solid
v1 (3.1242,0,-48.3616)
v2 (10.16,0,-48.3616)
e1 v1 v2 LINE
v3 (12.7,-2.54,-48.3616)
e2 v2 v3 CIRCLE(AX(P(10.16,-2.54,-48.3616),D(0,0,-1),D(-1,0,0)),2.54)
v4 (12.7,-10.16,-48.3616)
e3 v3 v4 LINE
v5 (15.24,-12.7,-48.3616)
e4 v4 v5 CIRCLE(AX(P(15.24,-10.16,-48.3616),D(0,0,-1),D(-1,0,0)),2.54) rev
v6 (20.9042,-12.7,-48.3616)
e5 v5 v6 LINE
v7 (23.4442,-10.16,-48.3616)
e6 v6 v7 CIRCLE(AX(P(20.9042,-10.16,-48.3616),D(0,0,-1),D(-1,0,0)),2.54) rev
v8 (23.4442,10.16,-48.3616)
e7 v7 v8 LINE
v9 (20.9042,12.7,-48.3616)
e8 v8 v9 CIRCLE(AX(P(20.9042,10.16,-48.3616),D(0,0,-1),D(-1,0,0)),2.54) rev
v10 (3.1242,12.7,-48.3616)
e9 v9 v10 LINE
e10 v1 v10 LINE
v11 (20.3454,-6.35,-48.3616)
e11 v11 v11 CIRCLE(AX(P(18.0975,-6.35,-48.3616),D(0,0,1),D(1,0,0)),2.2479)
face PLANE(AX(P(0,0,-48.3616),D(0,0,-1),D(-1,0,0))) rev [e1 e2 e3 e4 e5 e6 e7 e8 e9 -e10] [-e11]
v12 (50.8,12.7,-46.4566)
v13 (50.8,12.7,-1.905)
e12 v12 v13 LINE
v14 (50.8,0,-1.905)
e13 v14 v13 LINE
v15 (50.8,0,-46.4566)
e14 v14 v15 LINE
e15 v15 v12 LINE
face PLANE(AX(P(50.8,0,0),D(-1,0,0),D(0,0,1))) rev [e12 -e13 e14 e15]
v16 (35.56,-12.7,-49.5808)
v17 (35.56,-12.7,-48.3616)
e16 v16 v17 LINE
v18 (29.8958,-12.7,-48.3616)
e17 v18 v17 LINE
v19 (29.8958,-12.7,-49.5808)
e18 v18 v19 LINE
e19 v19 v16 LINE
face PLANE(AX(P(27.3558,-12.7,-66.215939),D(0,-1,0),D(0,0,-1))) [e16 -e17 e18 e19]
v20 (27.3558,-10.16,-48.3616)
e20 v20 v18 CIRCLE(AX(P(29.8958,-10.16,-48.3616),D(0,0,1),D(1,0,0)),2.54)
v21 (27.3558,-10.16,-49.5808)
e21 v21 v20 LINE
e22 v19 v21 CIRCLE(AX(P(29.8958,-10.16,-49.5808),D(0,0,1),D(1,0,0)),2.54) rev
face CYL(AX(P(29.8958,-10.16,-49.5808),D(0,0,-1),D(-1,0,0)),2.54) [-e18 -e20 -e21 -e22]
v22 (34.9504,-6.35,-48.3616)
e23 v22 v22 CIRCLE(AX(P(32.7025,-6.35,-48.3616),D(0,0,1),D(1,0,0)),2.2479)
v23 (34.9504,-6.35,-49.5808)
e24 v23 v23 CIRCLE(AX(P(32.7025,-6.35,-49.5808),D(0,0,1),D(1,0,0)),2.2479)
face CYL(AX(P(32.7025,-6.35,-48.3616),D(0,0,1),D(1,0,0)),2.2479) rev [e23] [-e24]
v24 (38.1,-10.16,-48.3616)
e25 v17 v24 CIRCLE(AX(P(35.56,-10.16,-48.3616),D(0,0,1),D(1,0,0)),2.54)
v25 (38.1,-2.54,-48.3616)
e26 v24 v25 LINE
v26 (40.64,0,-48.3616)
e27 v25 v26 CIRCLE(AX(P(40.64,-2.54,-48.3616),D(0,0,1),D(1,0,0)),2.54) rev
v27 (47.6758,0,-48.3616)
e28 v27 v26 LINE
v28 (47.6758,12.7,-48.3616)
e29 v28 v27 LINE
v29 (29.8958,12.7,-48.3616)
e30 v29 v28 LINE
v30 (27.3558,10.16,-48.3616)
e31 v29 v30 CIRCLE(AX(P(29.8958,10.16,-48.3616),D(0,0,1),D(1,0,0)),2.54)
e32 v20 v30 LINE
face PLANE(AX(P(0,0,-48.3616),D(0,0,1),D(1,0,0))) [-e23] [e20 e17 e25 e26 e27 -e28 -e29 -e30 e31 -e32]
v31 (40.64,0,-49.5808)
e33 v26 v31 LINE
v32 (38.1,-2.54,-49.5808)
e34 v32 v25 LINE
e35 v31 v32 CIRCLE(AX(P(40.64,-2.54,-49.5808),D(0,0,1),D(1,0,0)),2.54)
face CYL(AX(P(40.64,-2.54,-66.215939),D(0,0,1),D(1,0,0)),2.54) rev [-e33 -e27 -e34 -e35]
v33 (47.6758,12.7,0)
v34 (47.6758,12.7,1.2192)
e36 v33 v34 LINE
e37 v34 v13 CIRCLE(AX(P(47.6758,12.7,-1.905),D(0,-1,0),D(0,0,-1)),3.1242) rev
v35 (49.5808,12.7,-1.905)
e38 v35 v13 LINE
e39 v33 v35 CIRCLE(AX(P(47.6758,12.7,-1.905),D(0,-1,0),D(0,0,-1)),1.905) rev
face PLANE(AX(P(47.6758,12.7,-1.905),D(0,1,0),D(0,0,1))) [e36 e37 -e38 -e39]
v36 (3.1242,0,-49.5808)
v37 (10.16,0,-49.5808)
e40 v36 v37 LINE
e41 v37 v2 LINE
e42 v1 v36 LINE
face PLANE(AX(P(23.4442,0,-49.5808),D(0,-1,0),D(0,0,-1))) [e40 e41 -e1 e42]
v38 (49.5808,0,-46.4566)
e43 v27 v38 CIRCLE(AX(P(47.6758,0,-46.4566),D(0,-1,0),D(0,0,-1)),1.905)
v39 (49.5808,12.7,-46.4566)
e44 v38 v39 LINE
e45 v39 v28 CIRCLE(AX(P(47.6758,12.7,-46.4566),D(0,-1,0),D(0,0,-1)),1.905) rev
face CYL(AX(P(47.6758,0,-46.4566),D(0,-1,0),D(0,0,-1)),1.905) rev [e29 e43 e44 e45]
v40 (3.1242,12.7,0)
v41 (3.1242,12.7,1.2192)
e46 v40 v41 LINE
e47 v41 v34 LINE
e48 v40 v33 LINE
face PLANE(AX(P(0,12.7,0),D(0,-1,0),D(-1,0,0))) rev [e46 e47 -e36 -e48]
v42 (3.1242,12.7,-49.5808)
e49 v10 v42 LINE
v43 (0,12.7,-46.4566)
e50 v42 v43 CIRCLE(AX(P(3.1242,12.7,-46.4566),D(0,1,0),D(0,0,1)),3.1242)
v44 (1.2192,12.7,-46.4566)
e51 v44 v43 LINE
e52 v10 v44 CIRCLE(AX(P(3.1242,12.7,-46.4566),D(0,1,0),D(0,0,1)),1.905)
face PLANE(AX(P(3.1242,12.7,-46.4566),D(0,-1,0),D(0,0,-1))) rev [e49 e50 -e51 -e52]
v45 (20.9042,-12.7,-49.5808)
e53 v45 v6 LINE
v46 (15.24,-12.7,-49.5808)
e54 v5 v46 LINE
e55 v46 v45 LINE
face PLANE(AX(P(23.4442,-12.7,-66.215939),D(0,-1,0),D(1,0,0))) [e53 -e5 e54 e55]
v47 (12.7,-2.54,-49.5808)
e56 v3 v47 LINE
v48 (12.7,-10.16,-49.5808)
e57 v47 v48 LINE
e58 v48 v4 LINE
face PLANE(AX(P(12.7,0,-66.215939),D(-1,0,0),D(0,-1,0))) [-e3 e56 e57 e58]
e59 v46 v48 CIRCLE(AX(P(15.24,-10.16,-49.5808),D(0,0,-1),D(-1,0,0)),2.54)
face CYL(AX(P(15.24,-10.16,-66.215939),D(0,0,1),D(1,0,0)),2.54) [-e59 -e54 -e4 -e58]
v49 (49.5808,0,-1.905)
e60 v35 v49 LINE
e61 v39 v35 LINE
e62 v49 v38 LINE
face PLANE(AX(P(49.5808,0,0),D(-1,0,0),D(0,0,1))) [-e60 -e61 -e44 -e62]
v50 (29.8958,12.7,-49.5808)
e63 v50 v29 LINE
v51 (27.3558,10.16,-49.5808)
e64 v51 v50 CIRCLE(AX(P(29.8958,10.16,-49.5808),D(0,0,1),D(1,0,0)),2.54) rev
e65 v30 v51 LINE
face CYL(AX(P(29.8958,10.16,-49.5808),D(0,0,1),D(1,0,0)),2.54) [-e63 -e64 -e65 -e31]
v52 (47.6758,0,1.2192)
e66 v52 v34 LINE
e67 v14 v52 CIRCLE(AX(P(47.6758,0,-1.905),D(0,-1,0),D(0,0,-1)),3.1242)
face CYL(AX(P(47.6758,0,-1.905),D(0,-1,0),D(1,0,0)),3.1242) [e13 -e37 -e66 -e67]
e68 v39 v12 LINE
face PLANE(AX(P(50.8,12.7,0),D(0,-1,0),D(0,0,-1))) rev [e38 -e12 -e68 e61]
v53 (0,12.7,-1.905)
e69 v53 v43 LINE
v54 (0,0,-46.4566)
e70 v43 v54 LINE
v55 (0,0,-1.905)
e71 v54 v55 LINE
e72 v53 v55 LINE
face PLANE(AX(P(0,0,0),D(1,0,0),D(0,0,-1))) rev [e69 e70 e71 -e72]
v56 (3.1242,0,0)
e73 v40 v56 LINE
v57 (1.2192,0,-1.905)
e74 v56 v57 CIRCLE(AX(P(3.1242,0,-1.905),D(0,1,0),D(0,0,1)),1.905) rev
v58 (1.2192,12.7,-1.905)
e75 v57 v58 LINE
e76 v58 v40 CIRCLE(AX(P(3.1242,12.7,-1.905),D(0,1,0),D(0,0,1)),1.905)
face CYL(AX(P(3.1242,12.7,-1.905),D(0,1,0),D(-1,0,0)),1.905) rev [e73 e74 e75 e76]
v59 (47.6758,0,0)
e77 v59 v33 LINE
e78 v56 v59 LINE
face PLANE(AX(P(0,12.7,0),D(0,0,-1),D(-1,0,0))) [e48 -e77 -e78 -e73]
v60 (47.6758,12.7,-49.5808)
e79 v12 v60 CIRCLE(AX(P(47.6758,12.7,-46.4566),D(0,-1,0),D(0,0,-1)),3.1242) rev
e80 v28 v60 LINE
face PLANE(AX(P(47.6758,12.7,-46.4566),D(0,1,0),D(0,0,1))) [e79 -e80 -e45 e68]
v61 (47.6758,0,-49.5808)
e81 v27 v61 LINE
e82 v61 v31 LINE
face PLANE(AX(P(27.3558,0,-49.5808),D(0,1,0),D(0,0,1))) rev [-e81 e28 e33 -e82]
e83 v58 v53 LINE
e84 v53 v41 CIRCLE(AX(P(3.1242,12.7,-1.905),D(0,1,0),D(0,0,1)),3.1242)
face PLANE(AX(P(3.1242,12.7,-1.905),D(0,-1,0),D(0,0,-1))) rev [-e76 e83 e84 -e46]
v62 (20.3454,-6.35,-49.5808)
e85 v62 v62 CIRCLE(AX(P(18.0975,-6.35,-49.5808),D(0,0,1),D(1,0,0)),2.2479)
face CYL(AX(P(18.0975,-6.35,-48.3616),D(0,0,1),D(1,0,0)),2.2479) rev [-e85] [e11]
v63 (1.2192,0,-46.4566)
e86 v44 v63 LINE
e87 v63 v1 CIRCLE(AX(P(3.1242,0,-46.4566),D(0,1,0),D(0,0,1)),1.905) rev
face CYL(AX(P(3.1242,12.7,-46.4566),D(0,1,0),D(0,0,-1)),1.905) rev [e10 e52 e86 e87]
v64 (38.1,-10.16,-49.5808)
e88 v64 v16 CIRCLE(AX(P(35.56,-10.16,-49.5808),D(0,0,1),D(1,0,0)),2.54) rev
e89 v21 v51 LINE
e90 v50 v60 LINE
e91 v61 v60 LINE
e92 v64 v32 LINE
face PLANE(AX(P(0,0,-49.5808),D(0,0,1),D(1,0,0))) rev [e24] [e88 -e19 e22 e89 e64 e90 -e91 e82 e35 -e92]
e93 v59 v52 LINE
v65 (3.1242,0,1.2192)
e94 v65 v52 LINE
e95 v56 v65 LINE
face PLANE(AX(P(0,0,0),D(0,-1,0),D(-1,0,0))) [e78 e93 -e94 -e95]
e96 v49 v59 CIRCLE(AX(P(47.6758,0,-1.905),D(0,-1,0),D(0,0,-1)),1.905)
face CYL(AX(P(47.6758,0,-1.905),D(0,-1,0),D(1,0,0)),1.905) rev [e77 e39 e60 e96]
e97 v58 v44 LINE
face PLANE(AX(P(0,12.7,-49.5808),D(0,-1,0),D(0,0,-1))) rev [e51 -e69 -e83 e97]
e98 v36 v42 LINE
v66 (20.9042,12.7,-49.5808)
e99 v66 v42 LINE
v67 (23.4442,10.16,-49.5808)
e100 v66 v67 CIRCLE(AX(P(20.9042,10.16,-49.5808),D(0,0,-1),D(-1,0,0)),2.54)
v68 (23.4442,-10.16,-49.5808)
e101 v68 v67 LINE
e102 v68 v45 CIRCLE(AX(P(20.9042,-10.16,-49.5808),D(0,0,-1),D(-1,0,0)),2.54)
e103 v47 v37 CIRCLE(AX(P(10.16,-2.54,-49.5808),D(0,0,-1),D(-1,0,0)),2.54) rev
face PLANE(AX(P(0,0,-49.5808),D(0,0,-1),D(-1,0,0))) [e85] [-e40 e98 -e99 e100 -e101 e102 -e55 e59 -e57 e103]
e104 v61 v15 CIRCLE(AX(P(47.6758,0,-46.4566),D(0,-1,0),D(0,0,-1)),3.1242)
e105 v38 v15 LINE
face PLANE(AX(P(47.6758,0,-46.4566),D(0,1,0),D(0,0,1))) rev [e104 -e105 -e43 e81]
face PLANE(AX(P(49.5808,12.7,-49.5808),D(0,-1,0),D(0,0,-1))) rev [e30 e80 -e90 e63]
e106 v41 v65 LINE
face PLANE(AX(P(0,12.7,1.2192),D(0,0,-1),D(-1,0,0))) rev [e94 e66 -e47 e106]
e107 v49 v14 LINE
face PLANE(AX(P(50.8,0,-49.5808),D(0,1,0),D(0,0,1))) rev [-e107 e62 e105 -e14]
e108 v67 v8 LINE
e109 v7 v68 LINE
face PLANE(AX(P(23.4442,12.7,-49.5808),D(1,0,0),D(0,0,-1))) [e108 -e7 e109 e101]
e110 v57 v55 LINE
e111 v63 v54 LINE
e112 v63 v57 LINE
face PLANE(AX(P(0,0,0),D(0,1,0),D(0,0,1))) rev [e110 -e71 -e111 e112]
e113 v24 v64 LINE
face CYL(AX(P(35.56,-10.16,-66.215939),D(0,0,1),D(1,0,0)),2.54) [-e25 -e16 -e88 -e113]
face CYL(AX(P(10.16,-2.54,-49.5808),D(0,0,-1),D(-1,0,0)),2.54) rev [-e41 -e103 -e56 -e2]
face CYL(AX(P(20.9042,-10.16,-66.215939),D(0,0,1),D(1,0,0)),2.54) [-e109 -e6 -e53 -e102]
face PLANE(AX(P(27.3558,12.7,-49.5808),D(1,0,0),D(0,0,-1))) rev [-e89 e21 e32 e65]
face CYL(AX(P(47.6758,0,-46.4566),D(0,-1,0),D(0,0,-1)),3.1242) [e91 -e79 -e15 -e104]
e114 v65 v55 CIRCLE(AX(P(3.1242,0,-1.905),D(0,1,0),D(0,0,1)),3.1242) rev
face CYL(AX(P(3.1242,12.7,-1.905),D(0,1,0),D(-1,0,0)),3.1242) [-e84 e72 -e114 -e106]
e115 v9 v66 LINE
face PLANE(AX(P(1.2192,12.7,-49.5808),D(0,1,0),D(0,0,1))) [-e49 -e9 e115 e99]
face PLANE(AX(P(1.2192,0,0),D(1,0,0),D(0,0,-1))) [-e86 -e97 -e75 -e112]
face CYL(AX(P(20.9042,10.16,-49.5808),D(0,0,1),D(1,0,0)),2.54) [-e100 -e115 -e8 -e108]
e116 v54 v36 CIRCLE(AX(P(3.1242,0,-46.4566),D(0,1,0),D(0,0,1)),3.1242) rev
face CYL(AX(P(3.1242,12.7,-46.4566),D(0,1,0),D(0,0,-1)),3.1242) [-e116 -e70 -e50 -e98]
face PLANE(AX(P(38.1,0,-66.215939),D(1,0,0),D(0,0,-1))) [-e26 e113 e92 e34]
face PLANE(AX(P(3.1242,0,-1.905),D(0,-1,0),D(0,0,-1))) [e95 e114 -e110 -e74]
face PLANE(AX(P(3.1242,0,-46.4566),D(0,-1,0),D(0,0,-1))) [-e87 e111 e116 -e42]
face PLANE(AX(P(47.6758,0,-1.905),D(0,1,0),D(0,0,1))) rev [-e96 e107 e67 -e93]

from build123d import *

# Parameters (mm, degrees)
SKETCH1_W                      = 50.8
SKETCH1_H                      = 1.2192
BASE_FLANGE1_DEPTH             = 12.7
EDGE_FLANGE1_STRIP_W           = 8.6868
EDGE_FLANGE1_STRIP_H           = 1.2192
EDGE_FLANGE1_STRIP_CUT_DEPTH   = 12.7
EDGE_FLANGE1_STRIP_2_W         = 8.6868
EDGE_FLANGE1_STRIP_2_H         = 1.2192
EDGE_FLANGE1_STRIP_CUT_2_DEPTH = 12.7
EDGE_FLANGE1_DEPTH             = 12.7
EDGE_FLANGE1_BEND_DEPTH        = 12.7
EDGE_FLANGE2_STRIP_W           = 8.6868
EDGE_FLANGE2_STRIP_H           = 1.2192
EDGE_FLANGE2_STRIP_CUT_DEPTH   = 12.7
EDGE_FLANGE2_DEPTH             = 12.7
EDGE_FLANGE3_STRIP_W           = 8.6868
EDGE_FLANGE3_STRIP_H           = 1.2192
EDGE_FLANGE3_STRIP_CUT_DEPTH   = 12.7
EDGE_FLANGE3_DEPTH             = 12.7
SKETCH18_W                     = 10.7442
SKETCH18_H                     = 12.7
BOSS_EXTRUDE1_DEPTH            = 1.2192
FILLET1_R                      = 2.54
F_8_CLEARANCE_HOLE1_D          = 4.4958


# Sheet-metal steps are written as plain solids
with BuildPart() as part:
    # Sketch1 → Base-Flange1 (new body)
    with BuildSketch(Plane(origin=(0, 0, 0), x_dir=(1, 0, 0), z_dir=(0, 1, 0))):
        with Locations((25.4, -0.6096)):
            Rectangle(SKETCH1_W, SKETCH1_H)
    extrude(amount=BASE_FLANGE1_DEPTH)

    # Edge-Flange1 strip (across the edge) → Edge-Flange1 strip cut (cut)
    with BuildSketch(Plane(origin=(50.8, 12.7, 0), x_dir=(-1, 0, 0), z_dir=(0, -1, 0))):
        with Locations((-1.2192, -0.6096)):
            Rectangle(EDGE_FLANGE1_STRIP_W, EDGE_FLANGE1_STRIP_H)
    extrude(amount=EDGE_FLANGE1_STRIP_CUT_DEPTH, mode=Mode.SUBTRACT)

    # Edge-Flange1 strip 2 (across the edge) → Edge-Flange1 strip cut 2 (cut)
    with BuildSketch(Plane(origin=(0, 0, 0), x_dir=(1, 0, 0), z_dir=(0, 1, 0))):
        with Locations((-1.2192, -0.6096)):
            Rectangle(EDGE_FLANGE1_STRIP_2_W, EDGE_FLANGE1_STRIP_2_H)
    extrude(amount=EDGE_FLANGE1_STRIP_CUT_2_DEPTH, mode=Mode.SUBTRACT)

    # Edge-Flange1 section (across the edge) → Edge-Flange1 (add)
    with BuildSketch(Plane(origin=(50.8, 12.7, 0), x_dir=(-1, 0, 0), z_dir=(0, -1, 0))):
        with BuildLine():
            Line((0, 1.905), (0, 49.5808))
            Line((0, 49.5808), (1.2192, 49.5808))
            Line((1.2192, 49.5808), (1.2192, 1.905))
            ThreePointArc((1.2192, 1.905), (1.777161582, 0.557961582), (3.1242, 0))
            Line((3.1242, 0), (3.1242, -1.2192))
            ThreePointArc((3.1242, -1.2192), (0.915056994, -0.304143006), (0, 1.905))
        make_face()
    extrude(amount=EDGE_FLANGE1_DEPTH)

    # Edge-Flange1 section 2 (across the edge) → Edge-Flange1 bend (add)
    with BuildSketch(Plane(origin=(0, 0, 0), x_dir=(1, 0, 0), z_dir=(0, 1, 0))):
        with BuildLine():
            Line((0, 1.905), (0, 49.5808))
            Line((0, 49.5808), (1.2192, 49.5808))
            Line((1.2192, 49.5808), (1.2192, 1.905))
            ThreePointArc((1.2192, 1.905), (1.777161582, 0.557961582), (3.1242, 0))
            Line((3.1242, 0), (3.1242, -1.2192))
            ThreePointArc((3.1242, -1.2192), (0.915056994, -0.304143006), (0, 1.905))
        make_face()
    extrude(amount=EDGE_FLANGE1_BEND_DEPTH)

    # Edge-Flange2 strip (across the edge) → Edge-Flange2 strip cut (cut)
    with BuildSketch(Plane(origin=(49.5808, 12.7, -49.5808), x_dir=(0, 0, 1), z_dir=(0, -1, 0))):
        with Locations((-1.2192, -0.6096)):
            Rectangle(EDGE_FLANGE2_STRIP_W, EDGE_FLANGE2_STRIP_H)
    extrude(amount=EDGE_FLANGE2_STRIP_CUT_DEPTH, mode=Mode.SUBTRACT)

    # Edge-Flange2 section (across the edge) → Edge-Flange2 (add)
    with BuildSketch(Plane(origin=(49.5808, 12.7, -49.5808), x_dir=(0, 0, 1), z_dir=(0, -1, 0))):
        with BuildLine():
            Line((0, 1.905), (0, 22.225))
            Line((0, 22.225), (1.2192, 22.225))
            Line((1.2192, 22.225), (1.2192, 1.905))
            ThreePointArc((1.2192, 1.905), (1.777161582, 0.557961582), (3.1242, 0))
            Line((3.1242, 0), (3.1242, -1.2192))
            ThreePointArc((3.1242, -1.2192), (0.915056994, -0.304143006), (0, 1.905))
        make_face()
    extrude(amount=EDGE_FLANGE2_DEPTH)

    # Edge-Flange3 strip (across the edge) → Edge-Flange3 strip cut (cut)
    with BuildSketch(Plane(origin=(1.2192, 0, -49.5808), x_dir=(0, 0, 1), z_dir=(0, 1, 0))):
        with Locations((-1.2192, -0.6096)):
            Rectangle(EDGE_FLANGE3_STRIP_W, EDGE_FLANGE3_STRIP_H)
    extrude(amount=EDGE_FLANGE3_STRIP_CUT_DEPTH, mode=Mode.SUBTRACT)

    # Edge-Flange3 section (across the edge) → Edge-Flange3 (add)
    with BuildSketch(Plane(origin=(1.2192, 0, -49.5808), x_dir=(0, 0, 1), z_dir=(0, 1, 0))):
        with BuildLine():
            Line((0, 1.905), (0, 22.225))
            Line((0, 22.225), (1.2192, 22.225))
            Line((1.2192, 22.225), (1.2192, 1.905))
            ThreePointArc((1.2192, 1.905), (1.777161582, 0.557961582), (3.1242, 0))
            Line((3.1242, 0), (3.1242, -1.2192))
            ThreePointArc((3.1242, -1.2192), (0.915056994, -0.304143006), (0, 1.905))
        make_face()
    extrude(amount=EDGE_FLANGE3_DEPTH)

    # Sketch18 → Boss-Extrude1 (add)
    with BuildSketch(Plane.XY.offset(-48.3616)):
        with Locations((18.0721, -6.35)):
            Rectangle(SKETCH18_W, SKETCH18_H)
        with Locations((32.7279, -6.35)):
            Rectangle(SKETCH18_W, SKETCH18_H)
    extrude(amount=-BOSS_EXTRUDE1_DEPTH)

    # Fillet1
    fillet1_edges = [part.edges().sort_by_distance(p)[0] for p in [
        (23.4442, 12.7, -48.9712),
        (12.7, 0, -48.9712),
        (12.7, -12.7, -48.9712),
        (23.4442, -12.7, -48.9712),
        (38.1, -12.7, -48.9712),
        (38.1, 0, -48.9712),
        (27.3558, -12.7, -48.9712),
        (27.3558, 12.7, -48.9712),
    ]]
    fillet(fillet1_edges, radius=FILLET1_R)

    # #8 Clearance Hole1 (through all)
    with Locations(Plane.XY.offset(-48.3616)):
        with Locations((18.0975, -6.35), (32.7025, -6.35)):
            Hole(F_8_CLEARANCE_HOLE1_D / 2)


solid = part.part
